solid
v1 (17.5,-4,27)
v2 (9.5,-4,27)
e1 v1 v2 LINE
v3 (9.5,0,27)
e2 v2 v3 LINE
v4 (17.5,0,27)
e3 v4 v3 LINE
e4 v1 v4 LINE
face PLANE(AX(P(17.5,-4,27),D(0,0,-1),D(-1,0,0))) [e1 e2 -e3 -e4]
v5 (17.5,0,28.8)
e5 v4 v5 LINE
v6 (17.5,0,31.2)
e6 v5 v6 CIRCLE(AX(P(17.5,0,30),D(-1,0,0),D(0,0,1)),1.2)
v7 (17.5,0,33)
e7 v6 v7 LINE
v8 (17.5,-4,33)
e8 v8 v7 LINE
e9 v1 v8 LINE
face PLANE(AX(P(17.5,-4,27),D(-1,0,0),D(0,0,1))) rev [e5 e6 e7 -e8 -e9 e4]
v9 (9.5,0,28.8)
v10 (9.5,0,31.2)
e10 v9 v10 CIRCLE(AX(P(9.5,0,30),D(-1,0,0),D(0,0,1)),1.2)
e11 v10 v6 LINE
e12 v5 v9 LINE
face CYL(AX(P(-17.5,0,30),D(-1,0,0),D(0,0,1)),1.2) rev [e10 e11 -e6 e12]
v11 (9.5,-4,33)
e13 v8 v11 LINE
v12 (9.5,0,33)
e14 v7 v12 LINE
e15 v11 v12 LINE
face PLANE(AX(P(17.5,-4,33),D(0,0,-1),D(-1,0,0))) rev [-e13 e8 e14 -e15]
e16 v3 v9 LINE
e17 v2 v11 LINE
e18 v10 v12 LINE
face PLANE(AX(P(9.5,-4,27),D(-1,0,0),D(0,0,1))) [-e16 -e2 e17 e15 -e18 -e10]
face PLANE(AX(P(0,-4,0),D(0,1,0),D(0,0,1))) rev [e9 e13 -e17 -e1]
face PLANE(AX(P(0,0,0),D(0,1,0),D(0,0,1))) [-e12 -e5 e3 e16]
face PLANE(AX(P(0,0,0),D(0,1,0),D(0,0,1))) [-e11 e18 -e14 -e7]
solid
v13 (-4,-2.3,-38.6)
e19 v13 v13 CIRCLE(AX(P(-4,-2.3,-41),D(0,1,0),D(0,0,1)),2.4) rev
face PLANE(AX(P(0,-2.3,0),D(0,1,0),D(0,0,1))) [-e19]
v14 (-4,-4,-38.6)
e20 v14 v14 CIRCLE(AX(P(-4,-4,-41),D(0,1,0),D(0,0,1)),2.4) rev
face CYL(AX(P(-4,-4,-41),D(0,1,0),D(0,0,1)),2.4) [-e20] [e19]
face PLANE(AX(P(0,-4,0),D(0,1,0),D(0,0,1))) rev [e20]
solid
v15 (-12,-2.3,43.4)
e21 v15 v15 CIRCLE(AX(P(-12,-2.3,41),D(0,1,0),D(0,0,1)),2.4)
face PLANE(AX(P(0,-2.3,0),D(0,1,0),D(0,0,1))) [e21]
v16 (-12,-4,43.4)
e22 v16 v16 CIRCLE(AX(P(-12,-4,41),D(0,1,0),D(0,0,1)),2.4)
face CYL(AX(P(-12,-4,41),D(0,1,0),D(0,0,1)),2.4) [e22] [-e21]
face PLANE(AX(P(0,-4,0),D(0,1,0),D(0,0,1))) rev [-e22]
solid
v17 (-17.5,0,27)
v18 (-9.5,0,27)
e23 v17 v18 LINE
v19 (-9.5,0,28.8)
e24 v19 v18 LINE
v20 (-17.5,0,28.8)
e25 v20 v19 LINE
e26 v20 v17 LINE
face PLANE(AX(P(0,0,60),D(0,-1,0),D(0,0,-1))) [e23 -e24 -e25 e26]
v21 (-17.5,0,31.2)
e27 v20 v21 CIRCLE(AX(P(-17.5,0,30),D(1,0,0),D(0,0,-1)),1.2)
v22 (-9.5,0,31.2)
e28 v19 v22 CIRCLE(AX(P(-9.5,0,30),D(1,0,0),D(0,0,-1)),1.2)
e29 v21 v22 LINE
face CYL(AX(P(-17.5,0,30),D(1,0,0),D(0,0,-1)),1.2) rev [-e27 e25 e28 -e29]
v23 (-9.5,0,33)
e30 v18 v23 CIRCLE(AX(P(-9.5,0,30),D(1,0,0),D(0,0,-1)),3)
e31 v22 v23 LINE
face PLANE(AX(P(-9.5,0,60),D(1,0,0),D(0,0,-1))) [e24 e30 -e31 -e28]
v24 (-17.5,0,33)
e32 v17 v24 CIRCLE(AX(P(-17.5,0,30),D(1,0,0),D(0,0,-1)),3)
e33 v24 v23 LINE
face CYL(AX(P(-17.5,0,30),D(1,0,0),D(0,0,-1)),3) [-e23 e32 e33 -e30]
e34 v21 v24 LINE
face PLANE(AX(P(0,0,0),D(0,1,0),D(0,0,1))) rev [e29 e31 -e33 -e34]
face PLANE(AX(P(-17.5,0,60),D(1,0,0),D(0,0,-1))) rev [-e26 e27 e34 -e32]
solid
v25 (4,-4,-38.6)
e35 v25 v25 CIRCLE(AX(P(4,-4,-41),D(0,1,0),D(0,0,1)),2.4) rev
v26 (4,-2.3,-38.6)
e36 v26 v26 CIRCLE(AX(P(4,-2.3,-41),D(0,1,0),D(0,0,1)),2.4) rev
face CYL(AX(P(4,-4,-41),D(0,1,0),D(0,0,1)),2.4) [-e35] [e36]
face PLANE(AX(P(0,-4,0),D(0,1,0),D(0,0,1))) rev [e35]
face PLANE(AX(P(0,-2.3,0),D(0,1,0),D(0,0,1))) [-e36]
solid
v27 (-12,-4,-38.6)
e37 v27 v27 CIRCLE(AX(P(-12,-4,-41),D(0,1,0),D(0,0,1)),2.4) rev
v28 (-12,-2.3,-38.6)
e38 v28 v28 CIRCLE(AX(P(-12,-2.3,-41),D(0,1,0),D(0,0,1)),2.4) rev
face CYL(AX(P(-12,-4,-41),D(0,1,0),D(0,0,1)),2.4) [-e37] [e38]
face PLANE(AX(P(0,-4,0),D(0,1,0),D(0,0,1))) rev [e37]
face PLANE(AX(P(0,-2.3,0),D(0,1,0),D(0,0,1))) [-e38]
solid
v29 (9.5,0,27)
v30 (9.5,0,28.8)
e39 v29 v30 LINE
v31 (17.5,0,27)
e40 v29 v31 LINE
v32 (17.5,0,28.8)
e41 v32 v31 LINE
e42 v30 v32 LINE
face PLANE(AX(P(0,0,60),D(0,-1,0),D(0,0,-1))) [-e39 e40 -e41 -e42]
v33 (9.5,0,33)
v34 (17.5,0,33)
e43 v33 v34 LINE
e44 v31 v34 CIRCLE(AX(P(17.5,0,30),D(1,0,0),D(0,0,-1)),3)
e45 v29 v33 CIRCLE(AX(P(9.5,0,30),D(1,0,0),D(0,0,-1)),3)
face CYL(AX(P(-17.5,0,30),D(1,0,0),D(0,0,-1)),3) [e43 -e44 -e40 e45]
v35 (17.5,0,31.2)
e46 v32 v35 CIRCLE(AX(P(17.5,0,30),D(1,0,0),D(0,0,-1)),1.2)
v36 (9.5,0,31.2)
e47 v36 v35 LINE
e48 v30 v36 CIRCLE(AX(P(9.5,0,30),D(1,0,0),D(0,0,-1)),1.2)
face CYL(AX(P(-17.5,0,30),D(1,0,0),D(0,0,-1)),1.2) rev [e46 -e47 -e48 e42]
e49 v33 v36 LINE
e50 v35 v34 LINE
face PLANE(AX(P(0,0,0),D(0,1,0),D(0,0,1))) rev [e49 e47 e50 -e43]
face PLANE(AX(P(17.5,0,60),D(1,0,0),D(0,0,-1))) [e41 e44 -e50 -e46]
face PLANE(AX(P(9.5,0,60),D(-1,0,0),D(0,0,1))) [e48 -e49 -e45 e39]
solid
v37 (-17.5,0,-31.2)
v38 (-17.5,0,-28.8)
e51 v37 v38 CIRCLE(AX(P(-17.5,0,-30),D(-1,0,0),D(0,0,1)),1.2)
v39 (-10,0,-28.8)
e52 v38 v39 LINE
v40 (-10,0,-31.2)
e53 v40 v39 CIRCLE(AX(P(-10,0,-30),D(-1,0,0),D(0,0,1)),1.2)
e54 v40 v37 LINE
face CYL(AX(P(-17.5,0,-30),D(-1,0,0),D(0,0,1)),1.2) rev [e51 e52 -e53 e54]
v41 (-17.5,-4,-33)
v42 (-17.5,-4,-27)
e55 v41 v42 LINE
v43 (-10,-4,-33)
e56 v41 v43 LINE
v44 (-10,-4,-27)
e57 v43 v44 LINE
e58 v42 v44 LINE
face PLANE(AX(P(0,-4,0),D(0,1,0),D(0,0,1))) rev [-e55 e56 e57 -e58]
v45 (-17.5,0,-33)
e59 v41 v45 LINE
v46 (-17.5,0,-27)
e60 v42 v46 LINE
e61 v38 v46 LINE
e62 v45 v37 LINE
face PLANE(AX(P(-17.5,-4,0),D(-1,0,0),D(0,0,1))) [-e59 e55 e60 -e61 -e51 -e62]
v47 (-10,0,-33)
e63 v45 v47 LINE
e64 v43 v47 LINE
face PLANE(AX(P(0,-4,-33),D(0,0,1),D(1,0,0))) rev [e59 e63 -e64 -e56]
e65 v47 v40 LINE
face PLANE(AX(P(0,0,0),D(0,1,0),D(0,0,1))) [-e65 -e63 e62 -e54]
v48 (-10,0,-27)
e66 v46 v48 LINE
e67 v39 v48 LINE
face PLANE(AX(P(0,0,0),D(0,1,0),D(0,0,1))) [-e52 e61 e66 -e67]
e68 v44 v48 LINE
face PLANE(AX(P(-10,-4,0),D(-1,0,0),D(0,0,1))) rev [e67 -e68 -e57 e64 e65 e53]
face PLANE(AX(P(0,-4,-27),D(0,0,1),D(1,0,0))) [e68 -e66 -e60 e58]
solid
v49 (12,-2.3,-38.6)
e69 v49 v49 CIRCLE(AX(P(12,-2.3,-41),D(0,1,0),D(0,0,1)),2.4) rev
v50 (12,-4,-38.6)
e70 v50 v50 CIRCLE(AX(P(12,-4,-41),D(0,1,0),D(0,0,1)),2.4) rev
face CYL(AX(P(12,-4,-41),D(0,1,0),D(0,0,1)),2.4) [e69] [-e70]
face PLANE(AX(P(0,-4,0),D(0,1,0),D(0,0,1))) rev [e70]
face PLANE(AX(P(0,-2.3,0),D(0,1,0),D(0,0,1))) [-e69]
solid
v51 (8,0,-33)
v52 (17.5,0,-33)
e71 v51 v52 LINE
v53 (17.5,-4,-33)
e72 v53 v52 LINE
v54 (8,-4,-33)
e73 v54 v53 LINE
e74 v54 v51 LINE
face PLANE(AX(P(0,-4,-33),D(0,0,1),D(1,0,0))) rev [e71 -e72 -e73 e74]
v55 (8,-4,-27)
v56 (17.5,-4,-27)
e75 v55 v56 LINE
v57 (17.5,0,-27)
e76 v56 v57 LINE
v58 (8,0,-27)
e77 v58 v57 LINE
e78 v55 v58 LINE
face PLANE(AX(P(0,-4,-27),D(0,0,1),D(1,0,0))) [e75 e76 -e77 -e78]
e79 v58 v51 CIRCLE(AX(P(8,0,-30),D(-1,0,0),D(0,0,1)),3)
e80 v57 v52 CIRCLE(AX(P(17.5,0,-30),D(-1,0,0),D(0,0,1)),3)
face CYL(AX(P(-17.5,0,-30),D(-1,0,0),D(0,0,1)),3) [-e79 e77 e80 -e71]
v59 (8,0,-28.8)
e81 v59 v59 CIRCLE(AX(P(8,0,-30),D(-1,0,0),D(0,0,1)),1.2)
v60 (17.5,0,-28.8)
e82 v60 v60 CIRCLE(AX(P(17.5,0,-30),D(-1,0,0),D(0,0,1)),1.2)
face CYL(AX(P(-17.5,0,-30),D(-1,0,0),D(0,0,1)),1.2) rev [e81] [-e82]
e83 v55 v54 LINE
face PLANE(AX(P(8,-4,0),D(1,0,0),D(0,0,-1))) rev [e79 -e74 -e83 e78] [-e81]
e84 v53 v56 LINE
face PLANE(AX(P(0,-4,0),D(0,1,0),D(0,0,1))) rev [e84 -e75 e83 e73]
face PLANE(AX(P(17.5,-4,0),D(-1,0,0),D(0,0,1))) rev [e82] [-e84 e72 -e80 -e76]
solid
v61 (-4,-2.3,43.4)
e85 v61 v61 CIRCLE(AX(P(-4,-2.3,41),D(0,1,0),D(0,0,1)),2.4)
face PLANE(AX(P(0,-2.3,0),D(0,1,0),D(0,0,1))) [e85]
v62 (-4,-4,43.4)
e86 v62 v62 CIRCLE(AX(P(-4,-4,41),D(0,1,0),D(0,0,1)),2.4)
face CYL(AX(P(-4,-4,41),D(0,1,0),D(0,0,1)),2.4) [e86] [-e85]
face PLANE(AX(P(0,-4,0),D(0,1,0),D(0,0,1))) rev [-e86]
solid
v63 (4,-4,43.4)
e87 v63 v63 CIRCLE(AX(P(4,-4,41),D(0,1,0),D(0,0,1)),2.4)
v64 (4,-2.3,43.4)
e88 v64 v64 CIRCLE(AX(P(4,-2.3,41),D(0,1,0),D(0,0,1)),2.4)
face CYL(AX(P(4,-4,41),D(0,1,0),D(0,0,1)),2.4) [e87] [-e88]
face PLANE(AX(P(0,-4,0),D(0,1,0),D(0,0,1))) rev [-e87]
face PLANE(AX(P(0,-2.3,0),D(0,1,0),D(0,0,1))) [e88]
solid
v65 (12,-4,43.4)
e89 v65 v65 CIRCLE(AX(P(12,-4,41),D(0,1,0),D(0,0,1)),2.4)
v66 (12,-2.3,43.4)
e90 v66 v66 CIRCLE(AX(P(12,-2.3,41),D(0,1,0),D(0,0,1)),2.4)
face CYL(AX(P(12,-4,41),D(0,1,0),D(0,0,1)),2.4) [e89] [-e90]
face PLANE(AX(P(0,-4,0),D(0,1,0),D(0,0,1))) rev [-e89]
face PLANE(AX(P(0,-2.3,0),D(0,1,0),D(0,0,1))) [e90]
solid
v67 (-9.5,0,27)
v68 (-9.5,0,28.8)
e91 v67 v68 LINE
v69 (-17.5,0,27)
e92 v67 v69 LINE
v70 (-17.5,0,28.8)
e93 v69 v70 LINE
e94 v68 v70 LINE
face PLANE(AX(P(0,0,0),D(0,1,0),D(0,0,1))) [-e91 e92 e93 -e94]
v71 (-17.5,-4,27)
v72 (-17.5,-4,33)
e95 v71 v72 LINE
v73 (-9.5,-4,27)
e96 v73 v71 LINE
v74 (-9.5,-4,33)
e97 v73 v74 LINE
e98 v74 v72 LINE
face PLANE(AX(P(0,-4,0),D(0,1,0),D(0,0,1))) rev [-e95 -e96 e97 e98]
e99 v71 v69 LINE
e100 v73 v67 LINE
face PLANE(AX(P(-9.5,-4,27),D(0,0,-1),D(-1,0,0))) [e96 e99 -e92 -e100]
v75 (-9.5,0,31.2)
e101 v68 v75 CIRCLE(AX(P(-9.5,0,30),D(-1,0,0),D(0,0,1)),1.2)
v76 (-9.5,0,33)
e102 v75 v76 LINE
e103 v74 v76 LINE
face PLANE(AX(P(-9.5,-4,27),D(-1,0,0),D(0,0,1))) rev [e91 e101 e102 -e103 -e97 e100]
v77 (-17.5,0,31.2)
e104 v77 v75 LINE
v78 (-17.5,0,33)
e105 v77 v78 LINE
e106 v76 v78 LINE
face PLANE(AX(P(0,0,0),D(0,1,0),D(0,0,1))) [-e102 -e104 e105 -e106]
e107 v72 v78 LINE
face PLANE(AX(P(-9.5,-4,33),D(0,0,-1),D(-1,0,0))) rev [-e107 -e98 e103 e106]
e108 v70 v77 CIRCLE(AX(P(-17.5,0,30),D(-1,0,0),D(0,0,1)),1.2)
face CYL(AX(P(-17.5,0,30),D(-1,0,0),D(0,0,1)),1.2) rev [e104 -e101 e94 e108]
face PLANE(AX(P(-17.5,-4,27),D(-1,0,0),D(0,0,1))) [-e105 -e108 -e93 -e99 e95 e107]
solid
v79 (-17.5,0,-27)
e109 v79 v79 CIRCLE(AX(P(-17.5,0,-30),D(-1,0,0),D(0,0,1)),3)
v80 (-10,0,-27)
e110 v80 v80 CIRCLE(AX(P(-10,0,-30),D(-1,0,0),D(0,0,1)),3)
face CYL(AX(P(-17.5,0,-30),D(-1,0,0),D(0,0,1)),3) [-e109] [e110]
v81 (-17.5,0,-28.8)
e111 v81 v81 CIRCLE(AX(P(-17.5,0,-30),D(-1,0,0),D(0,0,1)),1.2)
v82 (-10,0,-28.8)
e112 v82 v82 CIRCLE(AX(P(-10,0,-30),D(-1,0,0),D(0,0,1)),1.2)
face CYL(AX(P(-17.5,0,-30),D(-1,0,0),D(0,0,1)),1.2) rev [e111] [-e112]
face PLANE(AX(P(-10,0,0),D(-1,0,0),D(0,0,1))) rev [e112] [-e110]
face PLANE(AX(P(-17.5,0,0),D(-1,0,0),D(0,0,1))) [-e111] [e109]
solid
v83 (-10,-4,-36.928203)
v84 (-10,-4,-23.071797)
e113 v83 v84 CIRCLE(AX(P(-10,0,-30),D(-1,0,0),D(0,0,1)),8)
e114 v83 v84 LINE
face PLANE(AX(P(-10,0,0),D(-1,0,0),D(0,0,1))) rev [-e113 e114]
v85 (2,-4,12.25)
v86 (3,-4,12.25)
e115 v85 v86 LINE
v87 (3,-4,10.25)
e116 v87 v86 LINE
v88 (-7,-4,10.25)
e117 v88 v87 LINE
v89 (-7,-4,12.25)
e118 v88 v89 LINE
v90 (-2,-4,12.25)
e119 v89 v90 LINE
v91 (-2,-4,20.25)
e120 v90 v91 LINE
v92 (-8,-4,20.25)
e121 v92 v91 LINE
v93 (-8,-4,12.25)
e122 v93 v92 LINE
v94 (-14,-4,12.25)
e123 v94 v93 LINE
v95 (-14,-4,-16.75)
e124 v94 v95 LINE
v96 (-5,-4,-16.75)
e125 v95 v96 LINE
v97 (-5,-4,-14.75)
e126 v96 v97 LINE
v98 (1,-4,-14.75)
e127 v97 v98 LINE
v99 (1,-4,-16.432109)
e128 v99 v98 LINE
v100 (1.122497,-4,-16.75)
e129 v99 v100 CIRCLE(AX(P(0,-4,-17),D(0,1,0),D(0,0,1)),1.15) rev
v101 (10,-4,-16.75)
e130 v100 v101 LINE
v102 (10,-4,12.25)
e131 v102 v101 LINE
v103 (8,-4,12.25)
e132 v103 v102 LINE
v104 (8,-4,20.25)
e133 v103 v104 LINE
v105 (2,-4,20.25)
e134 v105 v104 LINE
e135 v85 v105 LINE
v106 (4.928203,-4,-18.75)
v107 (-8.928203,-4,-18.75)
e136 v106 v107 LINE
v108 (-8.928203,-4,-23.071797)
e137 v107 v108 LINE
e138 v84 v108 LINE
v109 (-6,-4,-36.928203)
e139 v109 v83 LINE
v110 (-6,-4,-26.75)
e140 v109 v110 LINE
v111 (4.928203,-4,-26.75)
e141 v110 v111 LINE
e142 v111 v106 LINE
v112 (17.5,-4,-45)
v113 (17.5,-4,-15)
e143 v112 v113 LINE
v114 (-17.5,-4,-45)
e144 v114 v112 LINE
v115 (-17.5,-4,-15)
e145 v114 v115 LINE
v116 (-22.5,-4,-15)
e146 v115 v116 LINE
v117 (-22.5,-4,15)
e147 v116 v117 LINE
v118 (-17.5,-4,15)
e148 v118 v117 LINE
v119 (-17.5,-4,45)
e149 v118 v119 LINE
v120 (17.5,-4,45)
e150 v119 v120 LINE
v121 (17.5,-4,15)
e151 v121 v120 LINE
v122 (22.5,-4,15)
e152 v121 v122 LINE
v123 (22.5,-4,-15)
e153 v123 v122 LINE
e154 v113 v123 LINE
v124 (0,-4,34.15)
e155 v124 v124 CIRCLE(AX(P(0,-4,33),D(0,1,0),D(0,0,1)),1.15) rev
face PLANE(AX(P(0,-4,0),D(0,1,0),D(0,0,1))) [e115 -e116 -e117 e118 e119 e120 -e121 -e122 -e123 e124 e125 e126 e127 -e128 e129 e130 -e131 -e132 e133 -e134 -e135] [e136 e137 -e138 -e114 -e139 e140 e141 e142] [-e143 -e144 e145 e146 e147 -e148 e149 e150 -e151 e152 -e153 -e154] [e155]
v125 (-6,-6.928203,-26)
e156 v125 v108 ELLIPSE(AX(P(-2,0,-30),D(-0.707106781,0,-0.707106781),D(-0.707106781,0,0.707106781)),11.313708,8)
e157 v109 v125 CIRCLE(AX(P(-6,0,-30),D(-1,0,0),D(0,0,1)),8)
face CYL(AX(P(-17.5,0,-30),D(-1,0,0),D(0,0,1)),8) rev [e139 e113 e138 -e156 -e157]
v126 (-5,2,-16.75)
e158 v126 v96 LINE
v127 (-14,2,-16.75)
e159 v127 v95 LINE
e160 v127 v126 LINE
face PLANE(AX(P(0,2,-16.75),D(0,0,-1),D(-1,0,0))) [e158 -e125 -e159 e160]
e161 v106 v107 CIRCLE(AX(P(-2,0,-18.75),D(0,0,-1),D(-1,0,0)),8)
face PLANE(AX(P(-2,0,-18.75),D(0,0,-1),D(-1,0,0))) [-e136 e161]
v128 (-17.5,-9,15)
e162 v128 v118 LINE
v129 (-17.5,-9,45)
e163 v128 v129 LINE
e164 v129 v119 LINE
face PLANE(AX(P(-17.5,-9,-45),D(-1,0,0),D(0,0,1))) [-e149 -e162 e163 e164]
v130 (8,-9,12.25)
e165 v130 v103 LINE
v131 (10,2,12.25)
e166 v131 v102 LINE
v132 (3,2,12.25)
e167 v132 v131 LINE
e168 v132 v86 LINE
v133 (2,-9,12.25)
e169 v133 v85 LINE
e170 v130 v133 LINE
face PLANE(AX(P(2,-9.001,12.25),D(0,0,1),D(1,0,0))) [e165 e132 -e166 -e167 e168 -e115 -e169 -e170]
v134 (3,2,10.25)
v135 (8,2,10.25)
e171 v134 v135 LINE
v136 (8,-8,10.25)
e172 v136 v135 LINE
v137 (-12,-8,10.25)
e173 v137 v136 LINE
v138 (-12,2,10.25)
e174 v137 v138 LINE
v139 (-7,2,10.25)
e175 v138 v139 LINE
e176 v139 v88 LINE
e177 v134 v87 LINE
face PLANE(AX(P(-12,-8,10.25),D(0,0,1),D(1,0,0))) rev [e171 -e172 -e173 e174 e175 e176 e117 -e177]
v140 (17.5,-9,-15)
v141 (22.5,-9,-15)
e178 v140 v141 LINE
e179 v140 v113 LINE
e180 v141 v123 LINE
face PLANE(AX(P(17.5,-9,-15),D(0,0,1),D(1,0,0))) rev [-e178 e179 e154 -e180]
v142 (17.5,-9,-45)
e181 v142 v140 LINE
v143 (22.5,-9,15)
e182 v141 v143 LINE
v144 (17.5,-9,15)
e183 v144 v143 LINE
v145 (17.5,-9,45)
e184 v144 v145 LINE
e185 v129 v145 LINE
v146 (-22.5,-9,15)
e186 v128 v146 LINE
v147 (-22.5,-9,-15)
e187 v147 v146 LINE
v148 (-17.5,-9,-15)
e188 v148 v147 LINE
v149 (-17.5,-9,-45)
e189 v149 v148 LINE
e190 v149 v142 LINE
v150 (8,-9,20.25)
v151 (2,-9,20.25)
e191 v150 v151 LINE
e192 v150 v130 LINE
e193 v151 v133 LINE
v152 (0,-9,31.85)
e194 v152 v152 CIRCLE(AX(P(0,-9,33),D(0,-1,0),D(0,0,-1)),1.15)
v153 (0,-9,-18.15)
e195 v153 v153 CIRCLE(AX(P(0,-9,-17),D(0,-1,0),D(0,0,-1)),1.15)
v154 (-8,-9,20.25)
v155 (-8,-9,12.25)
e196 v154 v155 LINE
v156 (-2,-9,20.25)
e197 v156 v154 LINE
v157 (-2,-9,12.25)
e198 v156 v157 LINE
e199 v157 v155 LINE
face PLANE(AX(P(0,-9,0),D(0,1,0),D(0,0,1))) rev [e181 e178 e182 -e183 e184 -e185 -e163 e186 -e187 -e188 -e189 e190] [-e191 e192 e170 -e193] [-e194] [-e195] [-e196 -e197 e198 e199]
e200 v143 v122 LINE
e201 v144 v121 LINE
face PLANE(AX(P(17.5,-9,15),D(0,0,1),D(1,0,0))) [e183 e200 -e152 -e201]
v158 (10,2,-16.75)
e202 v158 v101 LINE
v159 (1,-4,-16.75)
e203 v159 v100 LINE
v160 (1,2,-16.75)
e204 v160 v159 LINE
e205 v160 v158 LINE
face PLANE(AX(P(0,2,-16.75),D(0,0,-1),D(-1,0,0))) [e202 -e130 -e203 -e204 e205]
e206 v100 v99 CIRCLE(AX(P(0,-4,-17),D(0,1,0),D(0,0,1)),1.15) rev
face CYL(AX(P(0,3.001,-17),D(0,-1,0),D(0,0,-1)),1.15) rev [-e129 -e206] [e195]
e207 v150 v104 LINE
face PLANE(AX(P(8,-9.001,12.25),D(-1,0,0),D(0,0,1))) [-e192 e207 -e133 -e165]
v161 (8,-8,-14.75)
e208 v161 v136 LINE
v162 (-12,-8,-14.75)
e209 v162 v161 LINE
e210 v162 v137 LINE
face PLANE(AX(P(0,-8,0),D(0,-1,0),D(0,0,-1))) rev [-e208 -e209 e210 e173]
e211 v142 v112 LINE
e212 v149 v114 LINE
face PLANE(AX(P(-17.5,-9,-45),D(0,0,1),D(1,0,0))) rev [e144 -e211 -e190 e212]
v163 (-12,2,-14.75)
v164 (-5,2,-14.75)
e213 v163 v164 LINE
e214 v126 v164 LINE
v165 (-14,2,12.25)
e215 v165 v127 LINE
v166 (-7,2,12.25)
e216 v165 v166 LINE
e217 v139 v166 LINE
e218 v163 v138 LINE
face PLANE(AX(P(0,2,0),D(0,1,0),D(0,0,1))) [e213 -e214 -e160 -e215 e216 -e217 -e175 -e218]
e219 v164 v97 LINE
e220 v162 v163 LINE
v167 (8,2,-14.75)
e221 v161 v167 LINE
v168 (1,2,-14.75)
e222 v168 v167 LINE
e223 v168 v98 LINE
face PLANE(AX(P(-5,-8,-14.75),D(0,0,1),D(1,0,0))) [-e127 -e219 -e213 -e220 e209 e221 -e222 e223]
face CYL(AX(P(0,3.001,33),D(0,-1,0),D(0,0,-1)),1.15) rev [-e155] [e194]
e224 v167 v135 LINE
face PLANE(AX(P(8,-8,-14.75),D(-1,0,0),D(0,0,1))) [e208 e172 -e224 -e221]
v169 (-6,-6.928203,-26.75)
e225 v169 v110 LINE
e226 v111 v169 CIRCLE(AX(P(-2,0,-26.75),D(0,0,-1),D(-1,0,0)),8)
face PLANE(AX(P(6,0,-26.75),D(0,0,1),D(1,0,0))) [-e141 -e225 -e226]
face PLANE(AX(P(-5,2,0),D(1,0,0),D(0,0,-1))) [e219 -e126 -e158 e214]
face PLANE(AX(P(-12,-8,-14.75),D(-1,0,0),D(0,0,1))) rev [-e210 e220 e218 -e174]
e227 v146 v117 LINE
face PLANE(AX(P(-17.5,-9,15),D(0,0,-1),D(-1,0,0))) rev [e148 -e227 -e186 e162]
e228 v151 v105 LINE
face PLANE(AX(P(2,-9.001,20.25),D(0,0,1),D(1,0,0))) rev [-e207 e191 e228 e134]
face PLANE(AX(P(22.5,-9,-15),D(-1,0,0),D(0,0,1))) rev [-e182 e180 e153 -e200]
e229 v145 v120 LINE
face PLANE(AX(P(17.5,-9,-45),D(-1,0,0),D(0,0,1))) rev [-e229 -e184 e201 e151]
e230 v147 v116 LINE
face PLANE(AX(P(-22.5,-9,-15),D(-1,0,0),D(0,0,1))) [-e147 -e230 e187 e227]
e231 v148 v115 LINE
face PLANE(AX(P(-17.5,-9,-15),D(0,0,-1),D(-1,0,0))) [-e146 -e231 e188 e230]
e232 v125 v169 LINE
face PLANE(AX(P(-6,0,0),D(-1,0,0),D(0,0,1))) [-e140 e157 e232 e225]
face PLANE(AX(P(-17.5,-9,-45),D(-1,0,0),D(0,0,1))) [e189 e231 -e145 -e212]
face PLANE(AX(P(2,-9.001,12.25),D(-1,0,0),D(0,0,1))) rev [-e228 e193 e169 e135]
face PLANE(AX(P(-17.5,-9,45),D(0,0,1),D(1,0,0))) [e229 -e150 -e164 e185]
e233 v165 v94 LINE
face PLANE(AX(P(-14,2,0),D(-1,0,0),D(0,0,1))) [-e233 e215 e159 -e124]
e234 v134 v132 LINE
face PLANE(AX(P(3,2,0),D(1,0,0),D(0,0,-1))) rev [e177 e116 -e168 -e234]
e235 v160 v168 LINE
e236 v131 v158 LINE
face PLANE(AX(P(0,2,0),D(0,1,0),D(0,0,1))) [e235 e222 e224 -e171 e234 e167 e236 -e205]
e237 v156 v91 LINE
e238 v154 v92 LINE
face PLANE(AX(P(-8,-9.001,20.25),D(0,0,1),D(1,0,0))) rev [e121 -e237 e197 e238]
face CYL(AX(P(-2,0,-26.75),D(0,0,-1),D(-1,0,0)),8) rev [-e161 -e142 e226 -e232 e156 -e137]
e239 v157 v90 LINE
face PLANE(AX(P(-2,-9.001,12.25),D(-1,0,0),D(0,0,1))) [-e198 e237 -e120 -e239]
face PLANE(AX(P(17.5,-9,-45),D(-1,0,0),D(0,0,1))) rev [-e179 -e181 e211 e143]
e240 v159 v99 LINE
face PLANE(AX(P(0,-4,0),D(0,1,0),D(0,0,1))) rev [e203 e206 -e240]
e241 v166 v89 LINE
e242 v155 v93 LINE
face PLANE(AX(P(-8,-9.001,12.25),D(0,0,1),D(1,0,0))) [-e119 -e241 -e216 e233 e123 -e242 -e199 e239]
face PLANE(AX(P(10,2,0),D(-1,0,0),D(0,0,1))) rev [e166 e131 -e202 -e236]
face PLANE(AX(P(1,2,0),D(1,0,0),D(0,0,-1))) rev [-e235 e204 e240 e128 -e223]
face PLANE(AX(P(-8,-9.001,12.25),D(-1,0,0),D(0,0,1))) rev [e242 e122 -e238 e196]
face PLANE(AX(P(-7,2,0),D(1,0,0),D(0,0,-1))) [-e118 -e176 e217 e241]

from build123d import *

# Parameters (mm, degrees)
SKETCH1_W             = 9.5
SKETCH1_H             = 1.8
SKETCH1_H_2           = 1.2
SKETCH1_H_3           = 3
SKETCH1_W_2           = 7.5
SKETCH1_W_3           = 8
SKETCH1_H_4           = 6
BOSS_EXTRUDE1_DEPTH   = 4
SKETCH1_3_W           = 8
SKETCH1_3_H           = 1.8
REVOLVE1_ANGLE        = 180
REVOLVE2_START        = -17.5
REVOLVE2_OUTLINE_R    = 3
REVOLVE2_OUTLINE_R_2  = 1.2
REVOLVE2_DEPTH        = 7.5
REVOLVE2_START_2      = 8
REVOLVE2_2_DEPTH      = 9.5
SKETCH1_6_W           = 7.5
SKETCH1_6_H           = 1.2
SKETCH1_6_W_2         = 9.5
BOSS_EXTRUDE2_START   = -4
SKETCH1_7_W           = 35
SKETCH1_7_H           = 90
SKETCH1_7_W_2         = 5
SKETCH1_7_H_2         = 30
BOSS_EXTRUDE2_DEPTH   = 5
SKETCH1_9_W           = 8
SKETCH1_9_H           = 1.2
SKETCH1_10_W          = 4
SKETCH1_10_H          = 3
SKETCH1_10_W_2        = 14
SKETCH1_10_H_2        = 1
CUT_EXTRUDE2_DEPTH    = 4
SKETCH9_R             = 1.15
CUT_EXTRUDE4_DEPTH    = 5
SKETCH10_W            = 6
SKETCH10_H            = 8
CUT_EXTRUDE5_DEPTH    = 5
BOSS_EXTRUDE3_DEPTH   = 6
BOSS_EXTRUDE4_START   = -2.3
SKETCH1_12_R          = 2.4
BOSS_EXTRUDE4_DEPTH   = 1.7
BOSS_EXTRUDE4_2_DEPTH = 1.7
BOSS_EXTRUDE4_3_DEPTH = 1.7
BOSS_EXTRUDE4_4_DEPTH = 1.7
BOSS_EXTRUDE4_5_DEPTH = 1.7
BOSS_EXTRUDE4_6_DEPTH = 1.7
BOSS_EXTRUDE4_7_DEPTH = 1.7
BOSS_EXTRUDE4_8_DEPTH = 1.7
SKETCH11_W            = 8
SKETCH11_H            = 8


# Read off the part's stored shape, not the designer's step: Revolve2
with BuildPart() as part:
    # Sketch1 → Boss-Extrude1 (new body)
    with BuildSketch(Plane(origin=(0, 0, 0), x_dir=(1, 0, 0), z_dir=(0, 1, 0))):
        with Locations((12.75, 27.9)):
            Rectangle(SKETCH1_W, SKETCH1_H)
        with Locations((12.75, 29.4)):
            Rectangle(SKETCH1_W, SKETCH1_H_2)
        with Locations((12.75, 31.5)):
            Rectangle(SKETCH1_W, SKETCH1_H_3)
        with Locations((-13.75, 27.9)):
            Rectangle(SKETCH1_W_2, SKETCH1_H)
        with Locations((-13.75, 29.4)):
            Rectangle(SKETCH1_W_2, SKETCH1_H_2)
        with Locations((-13.75, 31.5)):
            Rectangle(SKETCH1_W_2, SKETCH1_H_3)
        with Locations((13.5, -30)):
            Rectangle(SKETCH1_W_3, SKETCH1_H_4)
        with Locations((-13.5, -30)):
            Rectangle(SKETCH1_W_3, SKETCH1_H_4)
    extrude(amount=-BOSS_EXTRUDE1_DEPTH)

    # Revolve2 2 outline → Revolve2 2 (add)
    with BuildSketch(Plane.YZ.offset(REVOLVE2_START_2)):
        with BuildLine():
            Line((0, -27), (0, -28.8))
            ThreePointArc((0, -28.8), (1.2, -30), (0, -31.2))
            Line((0, -31.2), (0, -33))
            ThreePointArc((0, -33), (3, -30), (0, -27))
        make_face()
    extrude(amount=REVOLVE2_2_DEPTH)

    # Sketch1<6> → Cut-Revolve2 (revolve, cut)
    with BuildSketch(Plane(origin=(0, 0, 0), x_dir=(1, 0, 0), z_dir=(0, 1, 0))):
        with Locations((-13.75, 29.4)):
            Rectangle(SKETCH1_6_W, SKETCH1_6_H)
        with Locations((12.75, 29.4)):
            Rectangle(SKETCH1_6_W_2, SKETCH1_6_H)
        Polygon((-6, 30), (-10, 30), (-10, 28.8), (8, 28.8), (8, 30), align=None)
    revolve(axis=Axis((-17.5, 0, -30), (1, 0, 0)), mode=Mode.SUBTRACT)

    # Sketch1<9> → Cut-Revolve7 (revolve, cut)
    with BuildSketch(Plane(origin=(0, 0, 0), x_dir=(1, 0, 0), z_dir=(0, 1, 0))):
        with Locations((-13.5, -30.6)):
            Rectangle(SKETCH1_9_W, SKETCH1_9_H)
        with Locations((13.5, -30.6)):
            Rectangle(SKETCH1_9_W, SKETCH1_9_H)
    revolve(axis=Axis((-17.5, 0, 30), (1, 0, 0)), mode=Mode.SUBTRACT)


with BuildPart() as body_2:
    # Sketch1<3> → Revolve1 (revolve)
    with BuildSketch(Plane(origin=(0, 0, 0), x_dir=(1, 0, 0), z_dir=(0, 1, 0))):
        with Locations((-13.5, -32.1)):
            Rectangle(SKETCH1_3_W, SKETCH1_3_H)
        with Locations((13.5, -32.1)):
            Rectangle(SKETCH1_3_W, SKETCH1_3_H)
    revolve(axis=Axis((-17.5, 0, 30), (-1, 0, 0)), revolution_arc=REVOLVE1_ANGLE)


with BuildPart() as body_3:
    # Revolve2 outline → Revolve2 (new body)
    with BuildSketch(Plane.YZ.offset(REVOLVE2_START)):
        with Locations((0, -30)):
            Circle(REVOLVE2_OUTLINE_R)
        with Locations((0, -30)):
            Circle(REVOLVE2_OUTLINE_R_2, mode=Mode.SUBTRACT)
    extrude(amount=REVOLVE2_DEPTH)


with BuildPart() as body_4:
    # Sketch1<7> → Boss-Extrude2 (new body)
    with BuildSketch(Plane(origin=(0, 0, 0), x_dir=(1, 0, 0), z_dir=(0, 1, 0)).offset(BOSS_EXTRUDE2_START)):
        Rectangle(SKETCH1_7_W, SKETCH1_7_H)
        with Locations((-20, 0)):
            Rectangle(SKETCH1_7_W_2, SKETCH1_7_H_2)
        with Locations((20, 0)):
            Rectangle(SKETCH1_7_W_2, SKETCH1_7_H_2)
    extrude(amount=-BOSS_EXTRUDE2_DEPTH)

    # Sketch1<10> → Cut-Revolve8 (revolve, cut)
    with BuildSketch(Plane(origin=(0, 0, 0), x_dir=(1, 0, 0), z_dir=(0, 1, 0)), mode=Mode.PRIVATE) as cut_revolve8_sk:
        Polygon((-10, 38), (-10, 33), (-6, 33), (-6, 34), (-6, 38), align=None)
        with Locations((-8, 31.5)):
            Rectangle(SKETCH1_10_W, SKETCH1_10_H)
        with Locations((1, 33.5)):
            Rectangle(SKETCH1_10_W_2, SKETCH1_10_H_2)
        with Locations((1, 31.5)):
            Rectangle(SKETCH1_10_W_2, SKETCH1_10_H)
    revolve(cut_revolve8_sk.sketch.rotate(Axis((-17.5, 0, -30), (1, 0, 0)), 180), axis=Axis((-17.5, 0, -30), (1, 0, 0)), mode=Mode.SUBTRACT)

    # Sketch4 → Cut-Extrude2 (cut)
    with BuildSketch(Plane(origin=(0, -4, 0), x_dir=(1, 0, 0), z_dir=(0, 1, 0))):
        Polygon((-12, 14.75), (-5, 14.75), (8, 14.75), (8, -10.25), (-12, -10.25), align=None)
    extrude(amount=-CUT_EXTRUDE2_DEPTH, mode=Mode.SUBTRACT)

    # Sketch9 → Cut-Extrude4 (cut)
    with BuildSketch(Plane.XZ.offset(9)):
        with Locations(Location((0, 33, 0), (0, 0, 270))):
            Circle(SKETCH9_R)
        with Locations(Location((0, -17, 0), (0, 0, 270))):
            Circle(SKETCH9_R)
    extrude(amount=-CUT_EXTRUDE4_DEPTH, mode=Mode.SUBTRACT)

    # Sketch10 → Cut-Extrude5 (cut)
    with BuildSketch(Plane(origin=(0, -4, 0), x_dir=(1, 0, 0), z_dir=(0, 1, 0))):
        with Locations((-5, -16.25)):
            Rectangle(SKETCH10_W, SKETCH10_H)
        with Locations((5, -16.25)):
            Rectangle(SKETCH10_W, SKETCH10_H)
    extrude(amount=-CUT_EXTRUDE5_DEPTH, mode=Mode.SUBTRACT)

    # Sketch4<6> → Boss-Extrude3 (add)
    with BuildSketch(Plane(origin=(0, -4, 0), x_dir=(1, 0, 0), z_dir=(0, 1, 0))):
        Polygon((-12, -10.25), (-12, 14.75), (-5, 14.75), (-5, 16.75), (-14, 16.75), (-14, -12.25), (-7, -12.25), (-7, -10.25), align=None)
        Polygon((1, 16.75), (1, 14.75), (8, 14.75), (8, -10.25), (3, -10.25), (3, -12.25), (10, -12.25), (10, 16.75), align=None)
    extrude(amount=BOSS_EXTRUDE3_DEPTH)

    # Sketch11 → Cut-Revolve9 (revolve, cut)
    with BuildSketch(Plane(origin=(0, 0, 0), x_dir=(1, 0, 0), z_dir=(0, 1, 0))):
        with Locations((2, 22.75)):
            Rectangle(SKETCH11_W, SKETCH11_H)
    revolve(axis=Axis((-2, 0, -26.75), (0, 0, 1)), mode=Mode.SUBTRACT)


with BuildPart() as body_5:
    # Sketch1<12> → Boss-Extrude4 (new body)
    with BuildSketch(Plane(origin=(0, 0, 0), x_dir=(1, 0, 0), z_dir=(0, 1, 0)).offset(BOSS_EXTRUDE4_START)):
        with Locations(Location((-4, 41, 0), (0, 0, 270))):
            Circle(SKETCH1_12_R)
    extrude(amount=-BOSS_EXTRUDE4_DEPTH)


with BuildPart() as body_6:
    # Sketch1<12> → Boss-Extrude4 2 (new body)
    with BuildSketch(Plane(origin=(0, 0, 0), x_dir=(1, 0, 0), z_dir=(0, 1, 0)).offset(BOSS_EXTRUDE4_START)):
        with Locations(Location((4, 41, 0), (0, 0, 270))):
            Circle(SKETCH1_12_R)
    extrude(amount=-BOSS_EXTRUDE4_2_DEPTH)


with BuildPart() as body_7:
    # Sketch1<12> → Boss-Extrude4 3 (new body)
    with BuildSketch(Plane(origin=(0, 0, 0), x_dir=(1, 0, 0), z_dir=(0, 1, 0)).offset(BOSS_EXTRUDE4_START)):
        with Locations(Location((-12, 41, 0), (0, 0, 270))):
            Circle(SKETCH1_12_R)
    extrude(amount=-BOSS_EXTRUDE4_3_DEPTH)


with BuildPart() as body_8:
    # Sketch1<12> → Boss-Extrude4 4 (new body)
    with BuildSketch(Plane(origin=(0, 0, 0), x_dir=(1, 0, 0), z_dir=(0, 1, 0)).offset(BOSS_EXTRUDE4_START)):
        with Locations(Location((12, 41, 0), (0, 0, 270))):
            Circle(SKETCH1_12_R)
    extrude(amount=-BOSS_EXTRUDE4_4_DEPTH)


with BuildPart() as body_9:
    # Sketch1<12> → Boss-Extrude4 5 (new body)
    with BuildSketch(Plane(origin=(0, 0, 0), x_dir=(1, 0, 0), z_dir=(0, 1, 0)).offset(BOSS_EXTRUDE4_START)):
        with Locations(Location((12, -41, 0), (0, 0, 270))):
            Circle(SKETCH1_12_R)
    extrude(amount=-BOSS_EXTRUDE4_5_DEPTH)


with BuildPart() as body_10:
    # Sketch1<12> → Boss-Extrude4 6 (new body)
    with BuildSketch(Plane(origin=(0, 0, 0), x_dir=(1, 0, 0), z_dir=(0, 1, 0)).offset(BOSS_EXTRUDE4_START)):
        with Locations(Location((4, -41, 0), (0, 0, 270))):
            Circle(SKETCH1_12_R)
    extrude(amount=-BOSS_EXTRUDE4_6_DEPTH)


with BuildPart() as body_11:
    # Sketch1<12> → Boss-Extrude4 7 (new body)
    with BuildSketch(Plane(origin=(0, 0, 0), x_dir=(1, 0, 0), z_dir=(0, 1, 0)).offset(BOSS_EXTRUDE4_START)):
        with Locations(Location((-4, -41, 0), (0, 0, 270))):
            Circle(SKETCH1_12_R)
    extrude(amount=-BOSS_EXTRUDE4_7_DEPTH)


with BuildPart() as body_12:
    # Sketch1<12> → Boss-Extrude4 8 (new body)
    with BuildSketch(Plane(origin=(0, 0, 0), x_dir=(1, 0, 0), z_dir=(0, 1, 0)).offset(BOSS_EXTRUDE4_START)):
        with Locations(Location((-12, -41, 0), (0, 0, 270))):
            Circle(SKETCH1_12_R)
    extrude(amount=-BOSS_EXTRUDE4_8_DEPTH)


solid = Compound([part.part, body_2.part, body_3.part, body_4.part, body_5.part, body_6.part, body_7.part, body_8.part, body_9.part, body_10.part, body_11.part, body_12.part])
